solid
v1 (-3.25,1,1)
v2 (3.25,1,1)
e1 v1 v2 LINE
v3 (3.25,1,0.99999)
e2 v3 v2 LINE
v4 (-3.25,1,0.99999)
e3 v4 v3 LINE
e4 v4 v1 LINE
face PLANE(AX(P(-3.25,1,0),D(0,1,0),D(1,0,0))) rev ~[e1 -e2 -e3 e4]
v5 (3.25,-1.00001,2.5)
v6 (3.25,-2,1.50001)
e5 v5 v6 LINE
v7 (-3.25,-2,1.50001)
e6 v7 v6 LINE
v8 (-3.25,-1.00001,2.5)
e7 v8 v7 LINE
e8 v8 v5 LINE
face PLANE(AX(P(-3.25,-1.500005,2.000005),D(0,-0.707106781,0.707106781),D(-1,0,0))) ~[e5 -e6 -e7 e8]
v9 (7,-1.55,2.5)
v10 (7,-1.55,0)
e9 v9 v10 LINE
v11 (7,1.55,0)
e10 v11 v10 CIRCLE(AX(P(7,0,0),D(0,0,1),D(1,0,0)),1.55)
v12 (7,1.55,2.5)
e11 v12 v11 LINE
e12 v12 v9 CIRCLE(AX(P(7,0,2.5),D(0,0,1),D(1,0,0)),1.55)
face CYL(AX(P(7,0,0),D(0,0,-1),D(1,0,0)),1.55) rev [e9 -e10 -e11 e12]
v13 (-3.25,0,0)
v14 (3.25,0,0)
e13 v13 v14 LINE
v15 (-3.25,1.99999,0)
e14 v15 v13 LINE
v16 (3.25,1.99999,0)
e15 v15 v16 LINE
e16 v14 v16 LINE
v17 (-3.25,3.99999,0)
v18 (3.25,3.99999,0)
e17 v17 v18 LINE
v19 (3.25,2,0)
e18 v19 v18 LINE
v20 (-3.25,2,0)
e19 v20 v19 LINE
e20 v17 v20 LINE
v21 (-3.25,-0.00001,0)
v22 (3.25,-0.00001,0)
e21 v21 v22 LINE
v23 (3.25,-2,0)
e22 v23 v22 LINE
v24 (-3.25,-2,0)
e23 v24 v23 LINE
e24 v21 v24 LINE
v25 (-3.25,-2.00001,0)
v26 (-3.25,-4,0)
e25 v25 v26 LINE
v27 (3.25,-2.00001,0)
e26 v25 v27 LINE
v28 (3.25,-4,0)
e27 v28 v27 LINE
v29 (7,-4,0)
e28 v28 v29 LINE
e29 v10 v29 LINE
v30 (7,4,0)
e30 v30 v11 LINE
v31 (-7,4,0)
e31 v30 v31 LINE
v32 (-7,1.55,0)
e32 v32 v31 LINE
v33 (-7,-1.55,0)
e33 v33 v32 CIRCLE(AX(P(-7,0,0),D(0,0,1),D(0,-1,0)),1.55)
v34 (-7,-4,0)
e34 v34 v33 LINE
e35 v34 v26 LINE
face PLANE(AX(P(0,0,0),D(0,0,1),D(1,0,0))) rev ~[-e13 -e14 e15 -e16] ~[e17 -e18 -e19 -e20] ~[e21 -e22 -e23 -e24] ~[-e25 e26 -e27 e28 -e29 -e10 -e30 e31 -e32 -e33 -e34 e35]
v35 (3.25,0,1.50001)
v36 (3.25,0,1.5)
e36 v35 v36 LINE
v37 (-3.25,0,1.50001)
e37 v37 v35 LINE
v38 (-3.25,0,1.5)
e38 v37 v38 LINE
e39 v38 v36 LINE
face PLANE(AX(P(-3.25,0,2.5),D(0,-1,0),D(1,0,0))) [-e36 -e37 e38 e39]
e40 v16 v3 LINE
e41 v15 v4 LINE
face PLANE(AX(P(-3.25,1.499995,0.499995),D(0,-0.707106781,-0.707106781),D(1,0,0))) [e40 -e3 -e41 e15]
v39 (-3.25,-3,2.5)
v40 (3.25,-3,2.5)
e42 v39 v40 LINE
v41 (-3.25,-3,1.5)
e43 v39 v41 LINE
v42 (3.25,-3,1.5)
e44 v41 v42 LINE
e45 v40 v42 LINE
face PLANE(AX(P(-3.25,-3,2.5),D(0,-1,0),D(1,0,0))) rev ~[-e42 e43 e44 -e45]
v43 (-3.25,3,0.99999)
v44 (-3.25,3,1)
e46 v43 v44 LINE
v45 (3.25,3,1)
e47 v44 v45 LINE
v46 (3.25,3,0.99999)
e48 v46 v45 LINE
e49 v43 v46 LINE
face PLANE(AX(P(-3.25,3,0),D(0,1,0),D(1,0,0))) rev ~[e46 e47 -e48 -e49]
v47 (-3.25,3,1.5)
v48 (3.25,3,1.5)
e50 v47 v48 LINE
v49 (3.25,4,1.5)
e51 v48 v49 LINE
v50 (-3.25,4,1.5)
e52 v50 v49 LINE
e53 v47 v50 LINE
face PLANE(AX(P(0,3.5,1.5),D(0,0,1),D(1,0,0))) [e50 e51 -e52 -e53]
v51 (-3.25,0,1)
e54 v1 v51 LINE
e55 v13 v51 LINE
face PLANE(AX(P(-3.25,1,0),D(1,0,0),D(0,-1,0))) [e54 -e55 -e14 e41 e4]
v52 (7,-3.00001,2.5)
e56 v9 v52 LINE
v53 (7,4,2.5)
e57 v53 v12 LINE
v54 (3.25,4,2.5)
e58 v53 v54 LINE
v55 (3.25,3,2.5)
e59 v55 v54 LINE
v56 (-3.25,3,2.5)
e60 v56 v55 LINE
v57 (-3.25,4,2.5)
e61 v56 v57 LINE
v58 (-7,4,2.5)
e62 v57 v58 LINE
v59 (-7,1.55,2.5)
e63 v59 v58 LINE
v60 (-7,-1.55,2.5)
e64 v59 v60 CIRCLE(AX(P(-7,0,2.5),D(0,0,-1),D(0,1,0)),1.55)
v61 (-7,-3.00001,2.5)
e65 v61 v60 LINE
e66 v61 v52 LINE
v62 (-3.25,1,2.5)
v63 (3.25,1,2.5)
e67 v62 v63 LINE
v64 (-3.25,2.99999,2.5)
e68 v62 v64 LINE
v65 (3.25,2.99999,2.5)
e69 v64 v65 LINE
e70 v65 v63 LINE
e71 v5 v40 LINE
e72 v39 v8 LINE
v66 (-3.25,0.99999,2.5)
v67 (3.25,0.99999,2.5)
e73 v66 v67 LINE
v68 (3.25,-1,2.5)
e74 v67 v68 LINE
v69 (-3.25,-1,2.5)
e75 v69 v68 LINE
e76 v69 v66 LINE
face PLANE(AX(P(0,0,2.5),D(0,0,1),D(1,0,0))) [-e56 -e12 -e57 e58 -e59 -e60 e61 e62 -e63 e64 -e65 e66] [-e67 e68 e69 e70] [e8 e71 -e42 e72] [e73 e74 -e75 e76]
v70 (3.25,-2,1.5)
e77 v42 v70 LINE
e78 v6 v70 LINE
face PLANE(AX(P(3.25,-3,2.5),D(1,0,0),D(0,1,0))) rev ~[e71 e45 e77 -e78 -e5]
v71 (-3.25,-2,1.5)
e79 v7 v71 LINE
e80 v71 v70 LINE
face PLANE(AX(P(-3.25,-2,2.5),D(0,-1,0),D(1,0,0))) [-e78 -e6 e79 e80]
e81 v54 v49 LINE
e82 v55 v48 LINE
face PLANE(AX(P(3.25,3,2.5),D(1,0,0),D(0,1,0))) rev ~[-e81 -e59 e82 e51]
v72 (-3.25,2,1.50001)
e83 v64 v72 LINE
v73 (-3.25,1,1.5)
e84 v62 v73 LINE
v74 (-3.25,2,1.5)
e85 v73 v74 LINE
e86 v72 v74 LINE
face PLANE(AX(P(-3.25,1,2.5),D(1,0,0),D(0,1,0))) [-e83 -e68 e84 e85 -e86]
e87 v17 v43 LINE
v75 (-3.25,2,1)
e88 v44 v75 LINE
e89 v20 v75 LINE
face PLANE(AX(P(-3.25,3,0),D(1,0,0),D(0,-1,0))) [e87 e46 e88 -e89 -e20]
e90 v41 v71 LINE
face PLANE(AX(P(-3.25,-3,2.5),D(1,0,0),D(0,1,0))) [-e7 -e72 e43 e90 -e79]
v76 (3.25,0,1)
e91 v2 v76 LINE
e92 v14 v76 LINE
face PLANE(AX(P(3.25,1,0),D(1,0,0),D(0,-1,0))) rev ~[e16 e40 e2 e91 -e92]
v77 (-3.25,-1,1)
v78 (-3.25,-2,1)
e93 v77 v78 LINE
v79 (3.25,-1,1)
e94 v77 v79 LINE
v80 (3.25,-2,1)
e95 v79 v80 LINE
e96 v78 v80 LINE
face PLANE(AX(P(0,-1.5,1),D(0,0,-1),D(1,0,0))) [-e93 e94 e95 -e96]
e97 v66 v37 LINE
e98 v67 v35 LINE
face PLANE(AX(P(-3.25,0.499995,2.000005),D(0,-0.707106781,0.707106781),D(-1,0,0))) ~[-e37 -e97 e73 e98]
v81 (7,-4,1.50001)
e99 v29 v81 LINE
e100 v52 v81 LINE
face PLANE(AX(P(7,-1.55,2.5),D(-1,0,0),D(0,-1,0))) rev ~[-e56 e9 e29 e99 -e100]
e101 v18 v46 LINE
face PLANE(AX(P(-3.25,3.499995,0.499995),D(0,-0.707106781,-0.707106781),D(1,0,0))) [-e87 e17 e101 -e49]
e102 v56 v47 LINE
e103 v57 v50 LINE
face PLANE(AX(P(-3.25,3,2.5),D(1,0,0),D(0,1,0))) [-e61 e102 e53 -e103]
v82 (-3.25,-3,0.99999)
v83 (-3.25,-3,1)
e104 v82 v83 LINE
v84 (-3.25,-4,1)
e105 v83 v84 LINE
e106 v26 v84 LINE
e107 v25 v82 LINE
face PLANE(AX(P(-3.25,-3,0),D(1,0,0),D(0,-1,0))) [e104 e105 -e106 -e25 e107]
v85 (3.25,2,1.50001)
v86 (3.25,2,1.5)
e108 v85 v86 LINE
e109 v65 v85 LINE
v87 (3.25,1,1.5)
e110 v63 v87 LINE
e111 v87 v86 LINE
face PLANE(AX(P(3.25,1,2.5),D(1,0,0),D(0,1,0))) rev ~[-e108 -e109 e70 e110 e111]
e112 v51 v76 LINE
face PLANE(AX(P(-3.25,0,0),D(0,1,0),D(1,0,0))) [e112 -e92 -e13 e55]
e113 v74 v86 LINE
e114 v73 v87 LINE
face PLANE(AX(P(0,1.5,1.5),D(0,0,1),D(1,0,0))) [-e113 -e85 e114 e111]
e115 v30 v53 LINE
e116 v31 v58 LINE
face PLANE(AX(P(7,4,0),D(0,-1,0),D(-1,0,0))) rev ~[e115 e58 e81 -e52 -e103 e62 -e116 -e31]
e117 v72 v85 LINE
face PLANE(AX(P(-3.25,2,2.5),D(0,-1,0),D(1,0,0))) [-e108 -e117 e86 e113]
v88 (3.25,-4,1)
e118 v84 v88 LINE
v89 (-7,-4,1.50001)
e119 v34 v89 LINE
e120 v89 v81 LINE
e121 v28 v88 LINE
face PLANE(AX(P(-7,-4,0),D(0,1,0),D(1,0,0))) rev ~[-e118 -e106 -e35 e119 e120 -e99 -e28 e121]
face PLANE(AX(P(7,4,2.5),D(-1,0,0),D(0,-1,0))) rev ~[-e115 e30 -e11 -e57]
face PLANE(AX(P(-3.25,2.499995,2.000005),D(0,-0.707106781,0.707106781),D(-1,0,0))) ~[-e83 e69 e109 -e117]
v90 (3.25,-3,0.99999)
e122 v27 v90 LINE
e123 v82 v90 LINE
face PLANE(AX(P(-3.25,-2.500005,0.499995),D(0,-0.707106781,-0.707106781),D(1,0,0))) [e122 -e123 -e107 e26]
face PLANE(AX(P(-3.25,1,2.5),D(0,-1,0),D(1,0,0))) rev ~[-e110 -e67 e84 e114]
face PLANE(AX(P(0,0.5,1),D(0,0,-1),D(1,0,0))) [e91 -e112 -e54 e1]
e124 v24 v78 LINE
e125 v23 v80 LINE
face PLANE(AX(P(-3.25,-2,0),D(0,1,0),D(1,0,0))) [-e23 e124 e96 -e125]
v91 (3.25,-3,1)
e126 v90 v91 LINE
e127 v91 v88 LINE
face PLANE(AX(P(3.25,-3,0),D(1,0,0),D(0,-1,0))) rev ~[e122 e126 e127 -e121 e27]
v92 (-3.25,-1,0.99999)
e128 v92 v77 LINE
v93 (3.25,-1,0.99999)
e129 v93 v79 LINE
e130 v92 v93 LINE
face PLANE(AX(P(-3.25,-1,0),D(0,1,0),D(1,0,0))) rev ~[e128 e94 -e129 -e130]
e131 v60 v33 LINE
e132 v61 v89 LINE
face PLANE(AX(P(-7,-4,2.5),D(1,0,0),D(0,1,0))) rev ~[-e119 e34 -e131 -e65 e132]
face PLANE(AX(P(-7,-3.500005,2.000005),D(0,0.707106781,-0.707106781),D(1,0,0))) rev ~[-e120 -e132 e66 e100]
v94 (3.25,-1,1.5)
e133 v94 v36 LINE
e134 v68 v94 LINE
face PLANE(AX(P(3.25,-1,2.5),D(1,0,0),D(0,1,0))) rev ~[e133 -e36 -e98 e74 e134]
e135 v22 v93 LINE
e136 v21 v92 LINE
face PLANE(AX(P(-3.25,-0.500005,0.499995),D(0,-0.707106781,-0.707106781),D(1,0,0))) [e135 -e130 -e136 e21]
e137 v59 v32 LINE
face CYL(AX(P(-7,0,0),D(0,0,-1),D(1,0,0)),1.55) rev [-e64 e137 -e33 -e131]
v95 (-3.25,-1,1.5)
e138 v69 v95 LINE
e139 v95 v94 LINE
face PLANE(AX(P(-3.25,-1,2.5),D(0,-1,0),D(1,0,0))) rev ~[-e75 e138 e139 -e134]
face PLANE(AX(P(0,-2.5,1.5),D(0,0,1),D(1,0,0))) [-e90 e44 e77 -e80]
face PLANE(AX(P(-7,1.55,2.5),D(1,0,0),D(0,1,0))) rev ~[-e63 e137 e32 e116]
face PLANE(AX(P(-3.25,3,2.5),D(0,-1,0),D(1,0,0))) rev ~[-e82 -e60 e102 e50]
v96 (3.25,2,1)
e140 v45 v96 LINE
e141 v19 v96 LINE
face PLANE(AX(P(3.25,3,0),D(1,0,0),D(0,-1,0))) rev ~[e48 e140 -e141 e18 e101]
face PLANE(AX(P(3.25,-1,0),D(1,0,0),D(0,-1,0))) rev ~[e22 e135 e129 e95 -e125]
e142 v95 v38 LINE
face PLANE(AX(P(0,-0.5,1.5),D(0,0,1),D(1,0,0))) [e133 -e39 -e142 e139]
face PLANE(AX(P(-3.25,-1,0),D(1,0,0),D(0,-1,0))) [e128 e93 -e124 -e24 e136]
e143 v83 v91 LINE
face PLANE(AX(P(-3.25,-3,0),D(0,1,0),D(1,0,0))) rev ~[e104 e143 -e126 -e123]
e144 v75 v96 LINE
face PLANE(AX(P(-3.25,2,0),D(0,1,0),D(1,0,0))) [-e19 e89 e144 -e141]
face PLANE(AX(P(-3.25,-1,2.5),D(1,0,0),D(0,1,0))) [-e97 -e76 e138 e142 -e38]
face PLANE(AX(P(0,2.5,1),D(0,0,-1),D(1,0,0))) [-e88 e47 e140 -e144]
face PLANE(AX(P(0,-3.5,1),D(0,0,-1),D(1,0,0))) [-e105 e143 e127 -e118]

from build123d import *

# Parameters (mm, degrees)
F0_R     = 1.55
F1_DEPTH = 2.5
F3_DEPTH = 2.501
F4_W     = 6.5
F4_H     = 1
F5_DEPTH = 1
F6_W     = 6.5
F6_H     = 1
F7_DEPTH = 1
F8_SIZE  = 0.99999


# Not quite as in the source:
# - a fillet or chamfer is up to 0.001 mm smaller than in the source, because OpenCascade refuses the exact size


with BuildPart() as f1:
    # F0 (on Top) → F1 (new body)
    with BuildSketch(Plane.XY):
        with BuildLine():
            Line((7, 4), (-7, 4))
            ThreePointArc((-7, 4), (-9.8284271247, 2.8284271247), (-11, 0))
            ThreePointArc((-11, 0), (-9.8284271247, -2.8284271247), (-7, -4))
            Line((-7, -4), (7, -4))
            ThreePointArc((7, -4), (9.8284271247, -2.8284271247), (11, 0))
            ThreePointArc((11, 0), (9.8284271247, 2.8284271247), (7, 4))
        make_face()
        with Locations((-7, 0)):
            Circle(F0_R, mode=Mode.SUBTRACT)
        with Locations((7, 0)):
            Circle(F0_R, mode=Mode.SUBTRACT)
    extrude(amount=F1_DEPTH)

    # F2 (on face) → F3 (cut, through all)
    with BuildSketch(Plane.XY.offset(2.5)):
        with BuildLine():
            Line((-7, 1.55), (-7, 4))
            ThreePointArc((-7, 4), (-11, 0), (-7, -4))
            Line((-7, -4), (-7, -1.55))
            ThreePointArc((-7, -1.55), (-8.55, 0), (-7, 1.55))
        make_face()
        with BuildLine():
            ThreePointArc((7, -4), (11, 0), (7, 4))
            Line((7, 4), (7, 1.55))
            ThreePointArc((7, 1.55), (8.0960155108, 1.0960155108), (8.55, 0))
            ThreePointArc((8.55, 0), (8.0960155108, -1.0960155108), (7, -1.55))
            Line((7, -1.55), (7, -4))
        make_face()
    extrude(amount=-F3_DEPTH, mode=Mode.SUBTRACT)

    # F4 (on face) → F5 (cut)
    with BuildSketch(Plane.XY.offset(2.5)):
        with Locations((0, 1.5)):
            Rectangle(F4_W, F4_H)
        with Locations((0, -2.5)):
            Rectangle(F4_W, F4_H)
        with Locations((0, -0.5)):
            Rectangle(F4_W, F4_H)
        with Locations((0, 3.5)):
            Rectangle(F4_W, F4_H)
    extrude(amount=-F5_DEPTH, mode=Mode.SUBTRACT)

    # F6 (on face) → F7 (cut)
    with BuildSketch(Plane(origin=(0, 0, 0), x_dir=(1, 0, 0), z_dir=(0, 0, -1))):
        with Locations((0, -0.5)):
            Rectangle(F6_W, F6_H)
        with Locations((0, 3.5)):
            Rectangle(F6_W, F6_H)
        with Locations((0, 1.5)):
            Rectangle(F6_W, F6_H)
        with Locations((0, -2.5)):
            Rectangle(F6_W, F6_H)
    extrude(amount=-F7_DEPTH, mode=Mode.SUBTRACT)

    # F8 (size 1 in the source; OpenCascade refuses exactly that, so slightly less here)
    f8_edges = [f1.edges().sort_by_distance(p)[0] for p in [
        (0, 3, 0),
        (0, 1, 0),
        (0, -1, 0),
        (0, -3, 0),
        (0, -4, 2.5),
        (0, -2, 2.5),
        (0, 0, 2.5),
        (0, 2, 2.5),
    ]]
    chamfer(f8_edges, length=F8_SIZE)


solid = f1.part
